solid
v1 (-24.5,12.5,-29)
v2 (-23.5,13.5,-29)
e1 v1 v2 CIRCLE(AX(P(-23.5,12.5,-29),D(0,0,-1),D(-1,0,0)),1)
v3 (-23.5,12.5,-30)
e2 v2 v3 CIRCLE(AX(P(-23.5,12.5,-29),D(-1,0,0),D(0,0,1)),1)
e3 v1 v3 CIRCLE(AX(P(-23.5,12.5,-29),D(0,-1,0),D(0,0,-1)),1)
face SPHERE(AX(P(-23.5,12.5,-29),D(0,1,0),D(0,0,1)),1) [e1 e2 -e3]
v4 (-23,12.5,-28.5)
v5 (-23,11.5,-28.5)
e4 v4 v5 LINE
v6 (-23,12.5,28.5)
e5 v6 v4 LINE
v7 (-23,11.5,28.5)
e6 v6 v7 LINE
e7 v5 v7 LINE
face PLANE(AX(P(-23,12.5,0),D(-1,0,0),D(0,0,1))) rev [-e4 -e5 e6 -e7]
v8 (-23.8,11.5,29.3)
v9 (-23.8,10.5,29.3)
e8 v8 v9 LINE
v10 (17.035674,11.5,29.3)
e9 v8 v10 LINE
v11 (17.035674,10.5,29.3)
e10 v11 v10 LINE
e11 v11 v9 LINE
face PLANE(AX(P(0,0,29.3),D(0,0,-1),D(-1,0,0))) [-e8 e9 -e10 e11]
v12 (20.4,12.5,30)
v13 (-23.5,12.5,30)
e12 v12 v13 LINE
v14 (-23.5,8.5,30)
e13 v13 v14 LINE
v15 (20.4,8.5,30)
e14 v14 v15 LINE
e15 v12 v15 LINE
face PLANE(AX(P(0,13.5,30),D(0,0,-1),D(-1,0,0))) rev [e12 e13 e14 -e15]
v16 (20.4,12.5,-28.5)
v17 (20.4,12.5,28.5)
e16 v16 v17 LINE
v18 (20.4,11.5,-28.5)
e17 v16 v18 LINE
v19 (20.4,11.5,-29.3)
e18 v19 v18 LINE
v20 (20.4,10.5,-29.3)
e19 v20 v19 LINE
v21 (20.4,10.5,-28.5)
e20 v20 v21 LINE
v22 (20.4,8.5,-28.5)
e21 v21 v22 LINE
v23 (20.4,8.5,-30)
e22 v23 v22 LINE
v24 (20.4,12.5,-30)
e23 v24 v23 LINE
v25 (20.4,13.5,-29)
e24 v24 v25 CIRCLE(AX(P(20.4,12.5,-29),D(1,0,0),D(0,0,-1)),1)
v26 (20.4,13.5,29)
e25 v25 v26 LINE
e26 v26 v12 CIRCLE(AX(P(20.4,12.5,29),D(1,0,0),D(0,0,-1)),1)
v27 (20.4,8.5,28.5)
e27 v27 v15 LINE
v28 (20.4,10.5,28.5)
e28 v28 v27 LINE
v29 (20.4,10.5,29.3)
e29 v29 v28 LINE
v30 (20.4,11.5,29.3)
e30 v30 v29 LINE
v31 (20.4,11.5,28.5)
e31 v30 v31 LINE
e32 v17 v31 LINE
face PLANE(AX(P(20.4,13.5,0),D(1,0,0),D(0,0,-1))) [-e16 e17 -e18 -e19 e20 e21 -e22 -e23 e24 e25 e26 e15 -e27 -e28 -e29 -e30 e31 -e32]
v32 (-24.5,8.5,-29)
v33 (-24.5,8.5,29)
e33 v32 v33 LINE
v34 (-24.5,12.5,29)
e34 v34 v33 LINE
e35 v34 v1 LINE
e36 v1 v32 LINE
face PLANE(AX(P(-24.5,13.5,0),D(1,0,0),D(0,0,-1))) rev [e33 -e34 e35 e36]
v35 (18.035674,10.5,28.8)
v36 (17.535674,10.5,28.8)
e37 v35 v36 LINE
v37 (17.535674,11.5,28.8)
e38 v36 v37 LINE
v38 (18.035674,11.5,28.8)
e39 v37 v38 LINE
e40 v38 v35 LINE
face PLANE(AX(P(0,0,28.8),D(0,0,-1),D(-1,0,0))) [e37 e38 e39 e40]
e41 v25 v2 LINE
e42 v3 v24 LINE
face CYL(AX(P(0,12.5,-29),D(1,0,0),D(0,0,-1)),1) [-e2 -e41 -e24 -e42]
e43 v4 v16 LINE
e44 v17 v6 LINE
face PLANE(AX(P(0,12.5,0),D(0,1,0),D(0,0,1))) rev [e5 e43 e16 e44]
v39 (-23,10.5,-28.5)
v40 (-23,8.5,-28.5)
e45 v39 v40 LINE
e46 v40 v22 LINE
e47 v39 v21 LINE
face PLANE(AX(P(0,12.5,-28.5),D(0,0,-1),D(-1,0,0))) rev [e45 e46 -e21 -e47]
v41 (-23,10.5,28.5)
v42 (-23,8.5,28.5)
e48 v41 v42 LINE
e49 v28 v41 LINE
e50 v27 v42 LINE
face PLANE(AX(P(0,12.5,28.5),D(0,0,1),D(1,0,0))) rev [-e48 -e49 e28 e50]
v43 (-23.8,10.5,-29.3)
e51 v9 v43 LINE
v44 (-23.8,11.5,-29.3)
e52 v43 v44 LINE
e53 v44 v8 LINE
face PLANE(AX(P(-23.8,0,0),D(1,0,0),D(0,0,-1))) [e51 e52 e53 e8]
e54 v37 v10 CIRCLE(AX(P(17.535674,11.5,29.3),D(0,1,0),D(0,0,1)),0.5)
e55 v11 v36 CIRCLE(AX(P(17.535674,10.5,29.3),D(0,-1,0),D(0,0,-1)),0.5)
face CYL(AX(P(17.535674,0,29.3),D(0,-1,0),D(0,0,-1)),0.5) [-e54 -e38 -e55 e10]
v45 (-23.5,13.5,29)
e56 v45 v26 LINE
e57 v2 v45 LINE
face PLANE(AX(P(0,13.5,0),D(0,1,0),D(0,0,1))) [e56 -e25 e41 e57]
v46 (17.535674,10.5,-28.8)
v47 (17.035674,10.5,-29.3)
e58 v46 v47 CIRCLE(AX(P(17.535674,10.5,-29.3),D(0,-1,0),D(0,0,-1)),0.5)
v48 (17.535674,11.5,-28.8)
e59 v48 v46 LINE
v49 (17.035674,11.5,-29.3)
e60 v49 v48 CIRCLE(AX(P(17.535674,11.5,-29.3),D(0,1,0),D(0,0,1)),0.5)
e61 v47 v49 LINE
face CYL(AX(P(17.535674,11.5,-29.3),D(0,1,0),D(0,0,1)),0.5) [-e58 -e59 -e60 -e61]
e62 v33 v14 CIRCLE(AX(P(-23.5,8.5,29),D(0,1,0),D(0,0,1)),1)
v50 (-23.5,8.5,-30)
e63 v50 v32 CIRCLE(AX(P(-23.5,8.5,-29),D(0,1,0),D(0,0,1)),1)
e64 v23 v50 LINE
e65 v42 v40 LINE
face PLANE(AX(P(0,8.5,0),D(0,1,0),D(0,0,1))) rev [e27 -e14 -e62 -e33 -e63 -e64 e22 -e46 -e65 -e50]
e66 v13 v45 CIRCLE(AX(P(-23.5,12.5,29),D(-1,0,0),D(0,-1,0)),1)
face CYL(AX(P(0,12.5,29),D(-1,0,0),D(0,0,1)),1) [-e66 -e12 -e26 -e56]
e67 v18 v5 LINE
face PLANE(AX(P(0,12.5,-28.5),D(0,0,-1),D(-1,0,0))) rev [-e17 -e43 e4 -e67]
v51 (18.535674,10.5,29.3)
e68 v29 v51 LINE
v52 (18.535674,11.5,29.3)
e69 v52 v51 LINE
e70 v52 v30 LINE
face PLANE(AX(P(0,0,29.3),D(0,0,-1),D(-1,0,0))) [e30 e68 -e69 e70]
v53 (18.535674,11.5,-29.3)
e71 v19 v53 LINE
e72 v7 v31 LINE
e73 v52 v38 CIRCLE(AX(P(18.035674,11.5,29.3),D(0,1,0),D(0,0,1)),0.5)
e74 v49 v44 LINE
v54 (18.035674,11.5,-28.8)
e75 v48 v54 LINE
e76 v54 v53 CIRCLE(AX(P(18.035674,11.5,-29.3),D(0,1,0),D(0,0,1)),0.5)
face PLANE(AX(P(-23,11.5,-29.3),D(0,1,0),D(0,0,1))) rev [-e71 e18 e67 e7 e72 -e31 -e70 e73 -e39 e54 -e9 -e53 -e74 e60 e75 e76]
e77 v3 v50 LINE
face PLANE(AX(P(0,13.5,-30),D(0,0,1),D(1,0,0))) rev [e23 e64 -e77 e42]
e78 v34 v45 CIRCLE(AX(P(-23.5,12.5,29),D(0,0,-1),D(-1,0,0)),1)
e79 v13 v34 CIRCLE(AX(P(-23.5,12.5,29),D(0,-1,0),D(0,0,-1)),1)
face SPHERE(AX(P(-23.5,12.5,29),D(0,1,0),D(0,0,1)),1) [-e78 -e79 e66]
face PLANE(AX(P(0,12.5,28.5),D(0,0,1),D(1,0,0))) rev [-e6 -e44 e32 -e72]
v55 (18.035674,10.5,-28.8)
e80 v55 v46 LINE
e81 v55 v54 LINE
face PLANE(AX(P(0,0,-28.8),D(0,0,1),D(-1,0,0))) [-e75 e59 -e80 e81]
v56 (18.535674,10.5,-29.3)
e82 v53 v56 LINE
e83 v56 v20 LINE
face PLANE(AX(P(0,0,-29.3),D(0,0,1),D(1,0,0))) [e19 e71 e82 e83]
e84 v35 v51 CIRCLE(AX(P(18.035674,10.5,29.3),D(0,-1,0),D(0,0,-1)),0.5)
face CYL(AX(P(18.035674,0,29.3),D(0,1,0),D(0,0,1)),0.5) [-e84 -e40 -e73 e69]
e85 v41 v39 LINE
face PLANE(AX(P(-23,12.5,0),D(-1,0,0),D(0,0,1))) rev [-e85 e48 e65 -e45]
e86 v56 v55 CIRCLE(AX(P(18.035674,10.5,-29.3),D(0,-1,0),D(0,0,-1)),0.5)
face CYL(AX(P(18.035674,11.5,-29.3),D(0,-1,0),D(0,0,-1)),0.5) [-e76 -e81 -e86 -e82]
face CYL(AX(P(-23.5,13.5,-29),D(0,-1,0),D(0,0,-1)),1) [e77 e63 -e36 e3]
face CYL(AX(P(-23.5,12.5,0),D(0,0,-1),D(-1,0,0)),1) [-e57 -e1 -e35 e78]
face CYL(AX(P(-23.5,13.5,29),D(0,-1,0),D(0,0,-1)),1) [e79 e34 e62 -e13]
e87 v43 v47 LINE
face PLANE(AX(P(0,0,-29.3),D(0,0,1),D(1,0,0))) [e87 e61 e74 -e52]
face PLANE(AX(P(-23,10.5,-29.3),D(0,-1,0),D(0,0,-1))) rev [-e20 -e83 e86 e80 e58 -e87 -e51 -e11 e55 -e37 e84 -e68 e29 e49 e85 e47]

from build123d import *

# Parameters (mm, degrees)
BOSS_EXTRUDE1_DEPTH  = 5
SKETCH1_3_W          = 43.4
SKETCH1_3_H          = 57
CUT_EXTRUDE1_DEPTH   = 4
SKETCH4_W            = 43.4
SKETCH4_H            = 1
CUT_EXTRUDE2_DEPTH   = 0.8
SKETCH5_W            = 43.4
SKETCH5_H            = 1
CUT_EXTRUDE3_DEPTH   = 0.8
SKETCH6_W            = 58.6
SKETCH6_H            = 1
CUT_EXTRUDE4_DEPTH   = 0.8
FILLET1_R            = 1
SKETCH8_W            = 1.5
SKETCH8_H            = 1
BOSS_EXTRUDE2_DEPTH  = 0.5
FILLET2_R            = 0.5
FILLET2_OF_MIRROR1_R = 0.5


# Read off the part's stored shape, not the designer's step: Boss-Extrude1
with BuildPart() as part:
    # Boss-Extrude1 outline → Boss-Extrude1 (new body)
    with BuildSketch(Plane(origin=(0, 8.5, 0), x_dir=(1, 0, 0), z_dir=(0, 1, 0))):
        with BuildLine():
            Line((-23.5, -30), (20.4, -30))
            Line((20.4, -30), (20.4, 30))
            Line((20.4, 30), (-23.5, 30))
            ThreePointArc((-23.5, 30), (-24.207106781, 29.707106781), (-24.5, 29))
            Line((-24.5, 29), (-24.5, -29))
            ThreePointArc((-24.5, -29), (-24.207106781, -29.707106781), (-23.5, -30))
        make_face()
    extrude(amount=BOSS_EXTRUDE1_DEPTH)

    # Sketch1<3> → Cut-Extrude1 (cut)
    with BuildSketch(Plane(origin=(0, 8.5, 0), x_dir=(1, 0, 0), z_dir=(0, 1, 0))):
        with Locations((-1.3, 0)):
            Rectangle(SKETCH1_3_W, SKETCH1_3_H)
    extrude(amount=CUT_EXTRUDE1_DEPTH, mode=Mode.SUBTRACT)

    # Sketch4 → Cut-Extrude2 (cut)
    with BuildSketch(Plane.XY.offset(-28.5)):
        with Locations((-1.3, 11)):
            Rectangle(SKETCH4_W, SKETCH4_H)
    extrude(amount=-CUT_EXTRUDE2_DEPTH, mode=Mode.SUBTRACT)

    # Sketch5 → Cut-Extrude3 (cut)
    with BuildSketch(Plane(origin=(0, 0, 28.5), x_dir=(-1, 0, 0), z_dir=(0, 0, -1))):
        with Locations((1.3, 11)):
            Rectangle(SKETCH5_W, SKETCH5_H)
    extrude(amount=-CUT_EXTRUDE3_DEPTH, mode=Mode.SUBTRACT)

    # Sketch6 → Cut-Extrude4 (cut)
    with BuildSketch(Plane(origin=(-23, 0, 0), x_dir=(0, 0, -1), z_dir=(1, 0, 0))):
        with Locations((0, 11)):
            Rectangle(SKETCH6_W, SKETCH6_H)
    extrude(amount=-CUT_EXTRUDE4_DEPTH, mode=Mode.SUBTRACT)

    # Fillet1
    fillet1_edges = [part.edges().sort_by_distance(p)[0] for p in [
        (-1.55, 13.5, -30),
        (-24.207106781, 13.5, -29.707106781),
        (-24.5, 13.5, 0),
        (-24.207106781, 13.5, 29.707106781),
        (-1.55, 13.5, 30),
    ]]
    fillet(fillet1_edges, radius=FILLET1_R)

    # Sketch8 → Boss-Extrude2 (add)
    with BuildSketch(Plane(origin=(0, 0, 29.3), x_dir=(-1, 0, 0), z_dir=(0, 0, -1))):
        with Locations((-17.785673559, 11)):
            Rectangle(SKETCH8_W, SKETCH8_H)
    boss_extrude2 = extrude(amount=BOSS_EXTRUDE2_DEPTH)

    # Fillet2
    fillet2_edges = [part.edges().sort_by_distance(p)[0] for p in [
        (18.535673559, 11, 28.8),
        (17.035673559, 11, 28.8),
    ]]
    fillet(fillet2_edges, radius=FILLET2_R - 0.0001)  # a hair under: the kernel refuses the full size

    # Mirror1: Boss-Extrude2 across plane
    add(boss_extrude2.mirror(Plane(origin=(0, 0, 0), x_dir=(1, 0, 0), z_dir=(0, 0, -1))))

    # Fillet2 of Mirror1
    fillet2_of_mirror1_edges = [part.edges().sort_by_distance(p)[0] for p in [
        (18.535673559, 11, -28.8),
        (17.035673559, 11, -28.8),
    ]]
    fillet(fillet2_of_mirror1_edges, radius=FILLET2_OF_MIRROR1_R - 0.0001)  # a hair under: the kernel refuses the full size


solid = part.part
